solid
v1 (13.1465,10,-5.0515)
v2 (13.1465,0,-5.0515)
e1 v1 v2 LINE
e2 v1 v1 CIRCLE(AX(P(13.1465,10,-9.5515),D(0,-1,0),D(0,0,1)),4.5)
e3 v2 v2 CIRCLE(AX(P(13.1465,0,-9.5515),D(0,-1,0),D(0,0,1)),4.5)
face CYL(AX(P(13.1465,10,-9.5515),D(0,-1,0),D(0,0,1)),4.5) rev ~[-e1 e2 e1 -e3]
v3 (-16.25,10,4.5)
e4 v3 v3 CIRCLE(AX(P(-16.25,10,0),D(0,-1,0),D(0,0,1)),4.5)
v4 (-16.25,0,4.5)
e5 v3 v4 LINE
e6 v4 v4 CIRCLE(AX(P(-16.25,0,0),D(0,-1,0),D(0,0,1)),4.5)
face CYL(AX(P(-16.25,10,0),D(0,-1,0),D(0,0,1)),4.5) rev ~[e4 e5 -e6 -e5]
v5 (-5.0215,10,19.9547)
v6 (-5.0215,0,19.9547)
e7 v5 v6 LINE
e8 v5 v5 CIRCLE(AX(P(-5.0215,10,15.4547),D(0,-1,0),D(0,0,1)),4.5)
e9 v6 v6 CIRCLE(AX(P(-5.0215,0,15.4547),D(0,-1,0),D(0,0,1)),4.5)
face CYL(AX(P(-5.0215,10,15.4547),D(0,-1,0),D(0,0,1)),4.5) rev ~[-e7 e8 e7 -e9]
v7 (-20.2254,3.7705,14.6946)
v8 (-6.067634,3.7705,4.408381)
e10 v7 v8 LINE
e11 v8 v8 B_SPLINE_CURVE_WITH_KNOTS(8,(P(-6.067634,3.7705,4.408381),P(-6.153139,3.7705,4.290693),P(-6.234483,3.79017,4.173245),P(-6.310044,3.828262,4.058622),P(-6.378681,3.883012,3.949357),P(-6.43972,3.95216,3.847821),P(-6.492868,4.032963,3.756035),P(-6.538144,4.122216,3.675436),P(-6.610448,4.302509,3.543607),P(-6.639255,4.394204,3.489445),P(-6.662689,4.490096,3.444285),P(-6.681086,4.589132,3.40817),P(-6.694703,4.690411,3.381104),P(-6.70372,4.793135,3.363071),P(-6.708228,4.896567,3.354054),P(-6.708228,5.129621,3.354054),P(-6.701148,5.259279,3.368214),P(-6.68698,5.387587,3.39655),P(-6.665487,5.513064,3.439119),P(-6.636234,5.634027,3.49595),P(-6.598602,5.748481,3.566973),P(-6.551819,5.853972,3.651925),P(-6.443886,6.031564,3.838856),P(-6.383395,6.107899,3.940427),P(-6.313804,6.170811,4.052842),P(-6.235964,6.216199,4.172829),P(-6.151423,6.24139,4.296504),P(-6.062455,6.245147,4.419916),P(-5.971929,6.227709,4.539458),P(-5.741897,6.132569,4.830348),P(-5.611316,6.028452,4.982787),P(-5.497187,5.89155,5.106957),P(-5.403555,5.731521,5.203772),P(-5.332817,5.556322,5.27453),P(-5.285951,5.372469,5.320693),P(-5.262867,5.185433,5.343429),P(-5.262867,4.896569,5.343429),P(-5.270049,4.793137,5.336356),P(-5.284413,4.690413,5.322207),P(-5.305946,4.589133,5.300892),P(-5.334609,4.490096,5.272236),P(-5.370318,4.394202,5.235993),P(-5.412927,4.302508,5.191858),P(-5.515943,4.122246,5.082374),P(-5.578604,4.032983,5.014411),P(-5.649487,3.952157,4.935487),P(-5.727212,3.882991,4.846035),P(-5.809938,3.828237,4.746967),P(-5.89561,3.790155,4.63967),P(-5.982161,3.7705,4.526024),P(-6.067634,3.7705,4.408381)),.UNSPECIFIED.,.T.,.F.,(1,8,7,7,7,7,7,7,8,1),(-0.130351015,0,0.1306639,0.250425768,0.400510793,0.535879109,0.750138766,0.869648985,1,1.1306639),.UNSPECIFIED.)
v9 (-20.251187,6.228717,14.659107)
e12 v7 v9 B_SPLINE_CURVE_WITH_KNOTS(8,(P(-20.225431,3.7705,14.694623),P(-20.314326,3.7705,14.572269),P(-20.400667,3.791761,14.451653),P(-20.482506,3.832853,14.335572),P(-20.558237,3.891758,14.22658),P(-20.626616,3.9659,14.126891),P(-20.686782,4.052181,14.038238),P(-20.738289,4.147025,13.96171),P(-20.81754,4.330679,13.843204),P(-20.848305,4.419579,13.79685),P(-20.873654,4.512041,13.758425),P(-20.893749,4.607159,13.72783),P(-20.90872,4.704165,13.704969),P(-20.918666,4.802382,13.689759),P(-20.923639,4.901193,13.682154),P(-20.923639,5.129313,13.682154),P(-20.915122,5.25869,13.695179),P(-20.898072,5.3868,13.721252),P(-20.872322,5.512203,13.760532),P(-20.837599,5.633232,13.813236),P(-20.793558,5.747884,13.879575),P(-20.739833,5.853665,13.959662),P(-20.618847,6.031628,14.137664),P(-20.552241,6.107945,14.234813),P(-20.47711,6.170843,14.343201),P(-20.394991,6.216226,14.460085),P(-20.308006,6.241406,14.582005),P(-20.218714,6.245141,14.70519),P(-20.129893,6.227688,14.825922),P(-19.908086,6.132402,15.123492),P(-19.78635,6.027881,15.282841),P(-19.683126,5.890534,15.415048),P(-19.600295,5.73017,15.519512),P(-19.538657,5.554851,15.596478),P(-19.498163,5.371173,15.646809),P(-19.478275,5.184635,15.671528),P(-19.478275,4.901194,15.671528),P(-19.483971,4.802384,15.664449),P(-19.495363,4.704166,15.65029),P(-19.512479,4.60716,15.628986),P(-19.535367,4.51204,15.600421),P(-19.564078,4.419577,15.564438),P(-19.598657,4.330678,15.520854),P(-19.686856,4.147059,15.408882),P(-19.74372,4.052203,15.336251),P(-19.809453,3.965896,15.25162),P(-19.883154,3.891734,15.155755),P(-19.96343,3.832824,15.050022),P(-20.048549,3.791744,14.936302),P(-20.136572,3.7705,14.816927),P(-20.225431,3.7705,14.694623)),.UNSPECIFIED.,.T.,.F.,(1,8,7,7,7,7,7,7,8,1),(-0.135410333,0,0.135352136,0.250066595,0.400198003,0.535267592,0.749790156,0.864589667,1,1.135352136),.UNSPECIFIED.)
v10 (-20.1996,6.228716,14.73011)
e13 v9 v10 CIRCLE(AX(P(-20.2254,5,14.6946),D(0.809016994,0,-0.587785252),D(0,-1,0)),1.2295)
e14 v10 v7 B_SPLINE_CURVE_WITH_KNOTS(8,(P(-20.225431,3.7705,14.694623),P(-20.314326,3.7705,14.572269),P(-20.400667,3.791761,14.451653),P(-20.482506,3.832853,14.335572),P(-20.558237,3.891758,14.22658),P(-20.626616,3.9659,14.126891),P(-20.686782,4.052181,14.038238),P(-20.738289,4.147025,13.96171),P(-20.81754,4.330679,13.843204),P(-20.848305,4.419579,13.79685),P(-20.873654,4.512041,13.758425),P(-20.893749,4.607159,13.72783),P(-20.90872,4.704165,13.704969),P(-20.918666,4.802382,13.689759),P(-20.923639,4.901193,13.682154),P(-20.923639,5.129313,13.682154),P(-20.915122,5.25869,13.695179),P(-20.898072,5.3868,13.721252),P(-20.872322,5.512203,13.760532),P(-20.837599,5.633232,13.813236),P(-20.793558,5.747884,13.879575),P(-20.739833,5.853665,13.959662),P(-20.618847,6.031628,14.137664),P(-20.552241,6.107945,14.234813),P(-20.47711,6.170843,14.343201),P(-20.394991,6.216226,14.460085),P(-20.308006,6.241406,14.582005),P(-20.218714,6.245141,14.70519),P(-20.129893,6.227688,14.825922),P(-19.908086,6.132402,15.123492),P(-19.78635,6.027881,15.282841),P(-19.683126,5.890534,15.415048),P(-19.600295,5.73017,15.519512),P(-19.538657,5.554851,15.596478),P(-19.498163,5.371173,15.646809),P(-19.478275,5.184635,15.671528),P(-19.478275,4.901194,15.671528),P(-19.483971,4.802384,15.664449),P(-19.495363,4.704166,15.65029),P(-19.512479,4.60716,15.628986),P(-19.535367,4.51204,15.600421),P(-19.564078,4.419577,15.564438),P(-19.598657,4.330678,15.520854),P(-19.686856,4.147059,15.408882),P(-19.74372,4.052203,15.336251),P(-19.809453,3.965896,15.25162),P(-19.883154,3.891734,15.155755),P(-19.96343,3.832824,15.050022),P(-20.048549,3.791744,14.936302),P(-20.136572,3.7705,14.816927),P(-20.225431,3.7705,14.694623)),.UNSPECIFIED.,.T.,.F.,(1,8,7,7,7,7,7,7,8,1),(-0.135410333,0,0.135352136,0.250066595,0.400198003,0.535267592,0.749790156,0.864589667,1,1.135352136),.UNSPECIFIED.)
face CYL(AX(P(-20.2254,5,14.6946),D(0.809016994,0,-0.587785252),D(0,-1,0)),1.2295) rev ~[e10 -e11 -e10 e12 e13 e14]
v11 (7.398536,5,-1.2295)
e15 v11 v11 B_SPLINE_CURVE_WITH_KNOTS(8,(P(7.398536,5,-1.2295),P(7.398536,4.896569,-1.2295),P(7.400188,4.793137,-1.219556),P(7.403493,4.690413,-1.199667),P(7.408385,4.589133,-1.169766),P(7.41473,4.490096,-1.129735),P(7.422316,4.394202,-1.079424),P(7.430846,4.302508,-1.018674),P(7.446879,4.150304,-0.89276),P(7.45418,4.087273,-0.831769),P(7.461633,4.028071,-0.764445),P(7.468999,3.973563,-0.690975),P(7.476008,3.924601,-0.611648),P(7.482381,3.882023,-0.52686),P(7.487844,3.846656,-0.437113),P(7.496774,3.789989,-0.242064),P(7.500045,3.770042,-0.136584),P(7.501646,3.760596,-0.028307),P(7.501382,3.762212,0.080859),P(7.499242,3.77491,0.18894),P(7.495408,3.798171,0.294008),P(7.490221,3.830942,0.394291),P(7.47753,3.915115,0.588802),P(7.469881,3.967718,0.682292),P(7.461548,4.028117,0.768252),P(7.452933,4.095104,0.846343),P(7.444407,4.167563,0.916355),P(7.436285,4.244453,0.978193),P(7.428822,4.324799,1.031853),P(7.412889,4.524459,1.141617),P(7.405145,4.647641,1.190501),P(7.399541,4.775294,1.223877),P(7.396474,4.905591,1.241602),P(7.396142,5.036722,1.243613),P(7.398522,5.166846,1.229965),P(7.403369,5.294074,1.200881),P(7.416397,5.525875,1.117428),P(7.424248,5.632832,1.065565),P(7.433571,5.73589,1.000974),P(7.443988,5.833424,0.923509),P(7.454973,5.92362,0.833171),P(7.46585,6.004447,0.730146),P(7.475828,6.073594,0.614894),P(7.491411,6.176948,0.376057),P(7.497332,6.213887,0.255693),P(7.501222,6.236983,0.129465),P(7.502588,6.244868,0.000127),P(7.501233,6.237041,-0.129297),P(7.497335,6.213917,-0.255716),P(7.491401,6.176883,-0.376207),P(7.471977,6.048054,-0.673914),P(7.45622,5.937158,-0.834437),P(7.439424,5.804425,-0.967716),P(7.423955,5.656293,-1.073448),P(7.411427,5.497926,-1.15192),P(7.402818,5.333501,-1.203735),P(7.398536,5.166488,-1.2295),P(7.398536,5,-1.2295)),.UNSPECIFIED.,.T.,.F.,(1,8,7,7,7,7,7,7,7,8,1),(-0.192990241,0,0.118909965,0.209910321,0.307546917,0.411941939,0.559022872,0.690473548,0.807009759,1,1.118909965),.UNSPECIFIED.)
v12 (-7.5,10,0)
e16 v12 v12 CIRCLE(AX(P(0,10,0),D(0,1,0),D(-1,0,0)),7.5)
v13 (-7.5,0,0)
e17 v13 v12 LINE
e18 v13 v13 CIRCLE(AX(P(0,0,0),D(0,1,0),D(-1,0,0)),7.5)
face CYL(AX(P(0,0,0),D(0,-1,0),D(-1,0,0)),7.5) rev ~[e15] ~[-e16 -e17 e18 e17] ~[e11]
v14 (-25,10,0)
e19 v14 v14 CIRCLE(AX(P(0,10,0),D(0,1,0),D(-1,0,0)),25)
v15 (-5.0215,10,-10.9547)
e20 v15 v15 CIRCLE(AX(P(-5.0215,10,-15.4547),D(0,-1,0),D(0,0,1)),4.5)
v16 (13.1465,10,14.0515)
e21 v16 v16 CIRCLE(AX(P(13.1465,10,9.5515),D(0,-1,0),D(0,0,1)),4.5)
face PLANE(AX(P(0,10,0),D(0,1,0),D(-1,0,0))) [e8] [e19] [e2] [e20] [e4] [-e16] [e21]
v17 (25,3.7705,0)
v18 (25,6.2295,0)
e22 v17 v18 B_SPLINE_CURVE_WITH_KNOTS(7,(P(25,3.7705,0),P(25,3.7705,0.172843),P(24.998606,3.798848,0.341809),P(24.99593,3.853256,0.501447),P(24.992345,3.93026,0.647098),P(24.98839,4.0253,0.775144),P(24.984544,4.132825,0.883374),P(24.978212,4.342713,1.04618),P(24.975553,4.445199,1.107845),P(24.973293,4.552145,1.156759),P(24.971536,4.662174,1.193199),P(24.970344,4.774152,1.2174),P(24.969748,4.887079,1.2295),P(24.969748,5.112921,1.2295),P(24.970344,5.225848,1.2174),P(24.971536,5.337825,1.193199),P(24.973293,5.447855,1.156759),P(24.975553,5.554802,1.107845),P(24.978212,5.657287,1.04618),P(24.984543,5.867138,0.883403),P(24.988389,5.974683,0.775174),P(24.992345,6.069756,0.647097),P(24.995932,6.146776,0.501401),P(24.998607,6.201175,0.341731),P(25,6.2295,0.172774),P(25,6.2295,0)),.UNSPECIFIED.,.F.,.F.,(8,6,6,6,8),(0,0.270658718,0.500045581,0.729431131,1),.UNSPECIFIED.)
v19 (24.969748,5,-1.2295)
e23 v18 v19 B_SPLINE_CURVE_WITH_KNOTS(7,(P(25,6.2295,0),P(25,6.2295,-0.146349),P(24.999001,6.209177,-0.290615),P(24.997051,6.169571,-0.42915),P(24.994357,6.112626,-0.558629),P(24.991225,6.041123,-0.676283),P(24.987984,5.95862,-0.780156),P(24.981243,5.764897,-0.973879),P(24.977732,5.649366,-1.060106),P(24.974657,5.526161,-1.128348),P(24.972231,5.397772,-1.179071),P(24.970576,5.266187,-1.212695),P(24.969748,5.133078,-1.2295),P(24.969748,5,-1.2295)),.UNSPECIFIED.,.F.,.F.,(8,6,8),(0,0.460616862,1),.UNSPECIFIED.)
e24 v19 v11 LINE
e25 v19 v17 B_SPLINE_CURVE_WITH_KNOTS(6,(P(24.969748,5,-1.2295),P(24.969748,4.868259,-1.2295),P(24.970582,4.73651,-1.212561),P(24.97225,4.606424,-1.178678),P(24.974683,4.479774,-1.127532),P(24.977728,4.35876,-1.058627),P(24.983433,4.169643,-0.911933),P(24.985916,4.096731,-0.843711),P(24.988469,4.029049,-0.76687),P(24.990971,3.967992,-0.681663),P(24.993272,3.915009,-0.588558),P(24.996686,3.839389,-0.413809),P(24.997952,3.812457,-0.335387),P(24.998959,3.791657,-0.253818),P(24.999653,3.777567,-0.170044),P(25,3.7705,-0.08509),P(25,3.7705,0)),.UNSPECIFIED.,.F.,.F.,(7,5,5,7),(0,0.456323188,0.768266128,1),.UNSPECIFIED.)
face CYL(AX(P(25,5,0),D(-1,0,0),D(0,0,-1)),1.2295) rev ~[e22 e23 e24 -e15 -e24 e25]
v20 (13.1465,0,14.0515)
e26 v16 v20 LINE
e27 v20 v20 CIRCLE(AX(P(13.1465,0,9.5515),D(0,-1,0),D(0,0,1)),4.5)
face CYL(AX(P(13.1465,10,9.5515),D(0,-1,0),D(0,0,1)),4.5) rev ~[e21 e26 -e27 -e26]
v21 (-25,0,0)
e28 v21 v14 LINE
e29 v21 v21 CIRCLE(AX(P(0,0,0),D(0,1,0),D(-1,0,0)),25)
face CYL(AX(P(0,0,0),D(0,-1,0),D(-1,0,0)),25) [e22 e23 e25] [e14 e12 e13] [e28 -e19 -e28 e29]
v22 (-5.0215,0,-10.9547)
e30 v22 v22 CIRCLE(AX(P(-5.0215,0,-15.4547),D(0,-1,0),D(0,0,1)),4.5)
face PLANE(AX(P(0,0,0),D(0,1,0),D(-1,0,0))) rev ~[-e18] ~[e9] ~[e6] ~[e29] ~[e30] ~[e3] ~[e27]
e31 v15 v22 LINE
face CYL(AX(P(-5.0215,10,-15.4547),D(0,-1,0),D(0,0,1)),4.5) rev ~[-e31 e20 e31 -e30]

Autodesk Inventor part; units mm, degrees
ref_plane "YZ Plane" through (0, 0, 0) normal (1, 0, 0) x (0, 1, 0)
sketch "Skizze1" plane through (0, 0, 0) normal (0, 1, 0) x (-1, 0, 0)
  circle A0 centre (0, 0) radius 7.5
  circle A1 centre (0, 0) radius 25
  dimension "d0" = 15
  dimension "d1" = 50
extrude "Extrusion1" add sketch "Skizze1" along normal blind 10
sketch "Skizze2" plane through (0, 10, 0) normal (0, 1, 0) x (1, 0, 0)
  circle A0 centre (0, 0) radius 25 projected
  line L0 (-25, 0) -> (-16.25, 0)
  line L1 (0, 0) -> (8.75, 0) construction
  line L2 (0, 0) -> (-5.0215, 15.4547)
  line L3 (0, 0) -> (16.25, 0) construction
  line L4 (0, 0) -> (13.1465, 9.5515)
  line L5 (0, 0) -> (16.25, 0) construction
  line L6 (0, 0) -> (16.25, 0) construction
  line L7 (0, 0) -> (13.1465, -9.5515)
  line L8 (0, 0) -> (16.25, 0) construction
  line L9 (0, 0) -> (-5.0215, -15.4547)
  line L10 (0, 0) -> (16.25, 0) construction
  circle A1 centre (-16.25, 0) radius 4.3
  circle A2 centre (-5.0215, 15.4547) radius 4.3
  circle A3 centre (13.1465, 9.5515) radius 4.3
  circle A4 centre (13.1465, -9.5515) radius 4.3
  circle A5 centre (-5.0215, -15.4547) radius 4.3
  dimension "d4" = 8.75
  dimension "d9" = 16.25
  dimension "d10" = 108
  dimension "d11" = 16.25
  dimension "d12" = 36
  dimension "d15" = 16.25
  dimension "d16" = 36
  dimension "d17" = 16.25
  dimension "d18" = 108
  dimension "d19" = 8.6
  dimension "d20" = 8.6
  dimension "d21" = 8.6
  dimension "d22" = 8.6
  dimension "d23" = 8.6
hole "Bohrung1" at (-16.25, 10, 0) at (-5.0215, 10, -15.4547) at (13.1465, 10, -9.5515) at (13.1465, 10, 9.5515) at (-5.0215, 10, 15.4547) direction (0, -1, 0) diameter 9 end through all
sketch "Skizze3" plane through (0, 0, 0) normal (1, 0, 0) x (0, 1, 0)
  point P0 (0, 0)
sketch "Skizze4" plane through (0, 0, 0) normal (1, 0, 0) x (0, 1, 0)
  line L0 (0, 0) -> (5, 0)
sketch "Skizze6" plane through (0, 10, 0) normal (0, 1, 0) x (1, 0, 0)
  circle A0 centre (-5.0215, -15.4547) radius 4.5 projected
  circle A1 centre (-16.25, 0) radius 4.5 projected
  circle A2 centre (0, 0) radius 25 projected
  line L0 (0, 0) -> (-8.7488, -12.9333)
  line L1 (0, 0) -> (-15.0038, -4.324)
  line L2 (-11.8428, -8.6043) -> (-20.2254, -14.6946)
  line L3 (-11.8428, -8.6043) -> (-1.4813, -8.6043) construction
  line L4 (0, 0) -> (-11.8428, -8.6043)
  dimension "d36" = 5.321
  dimension "d37" = 144
sketch "Skizze7" plane through (0, 0, 0) normal (0, -1, 0) x (1, 0, 0)
  line L0 (0, 0) -> (-20.2254, 14.6946)
  circle A0 centre (0, 0) radius 25 projected
  line L1 (0, 0) -> (25, 0) construction
  line L2 (-20.2254, 14.6946) -> (44.6167, -28.5072)
  dimension "d38" = 144
ref_plane "Arbeitsebene1" through (-20.2254, 10, 14.6946) normal (-0.809017, 0, 0.5877853) x (0, -1, 0)
sketch "Skizze8" plane through (-20.2254, 10, 14.6946) normal (-0.809017, 0, 0.5877853) x (0, -1, 0)
  line L0 (10, 0) -> (5, 0)
  dimension "d39" = 5
hole "Bohrung2" at (-20.2254, 5, 14.6946) direction (0.809017, 0, -0.5877853) diameter 2.459 depth 27.8 tip angle 118 thread size "M3x0.5" class "6H" standard "ISO Metric profile"
sketch "Skizze9" plane through (0, 0, 0) normal (0, -1, 0) x (1, 0, 0)
  line L0 (0, 0) -> (25, 0)
  circle A0 centre (0, 0) radius 25 projected
  line L1 (0, 0) -> (14.68, 5.3208)
  circle A1 centre (13.1465, 9.5515) radius 4.5 projected
  line L2 (0, 0) -> (14.68, -5.3208)
  circle A2 centre (13.1465, -9.5515) radius 4.5 projected
  line L3 (0, 0) -> (25, 0)
sketch "Skizze10" plane through (0, 10, 0) normal (0, 1, 0) x (1, 0, 0)
  line L0 (0, 0) -> (25, 0)
  circle A0 centre (0, 0) radius 25 projected
ref_plane "Arbeitsebene2" through (25, 0, 0) normal (1, 0, 0) x (0, 1, 0)
sketch "Skizze11" plane through (25, 0, 0) normal (1, 0, 0) x (0, 1, 0)
  line L0 (0, 0) -> (5, 0)
  dimension "d47" = 5
hole "Bohrung3" at (25, 5, 0) direction (-1, 0, 0) diameter 2.459 depth 27.8 tip angle 118 thread size "M3x0.5" class "6H" standard "ISO Metric profile"
properties part number "Flansch" material "Aluminium 6061"
